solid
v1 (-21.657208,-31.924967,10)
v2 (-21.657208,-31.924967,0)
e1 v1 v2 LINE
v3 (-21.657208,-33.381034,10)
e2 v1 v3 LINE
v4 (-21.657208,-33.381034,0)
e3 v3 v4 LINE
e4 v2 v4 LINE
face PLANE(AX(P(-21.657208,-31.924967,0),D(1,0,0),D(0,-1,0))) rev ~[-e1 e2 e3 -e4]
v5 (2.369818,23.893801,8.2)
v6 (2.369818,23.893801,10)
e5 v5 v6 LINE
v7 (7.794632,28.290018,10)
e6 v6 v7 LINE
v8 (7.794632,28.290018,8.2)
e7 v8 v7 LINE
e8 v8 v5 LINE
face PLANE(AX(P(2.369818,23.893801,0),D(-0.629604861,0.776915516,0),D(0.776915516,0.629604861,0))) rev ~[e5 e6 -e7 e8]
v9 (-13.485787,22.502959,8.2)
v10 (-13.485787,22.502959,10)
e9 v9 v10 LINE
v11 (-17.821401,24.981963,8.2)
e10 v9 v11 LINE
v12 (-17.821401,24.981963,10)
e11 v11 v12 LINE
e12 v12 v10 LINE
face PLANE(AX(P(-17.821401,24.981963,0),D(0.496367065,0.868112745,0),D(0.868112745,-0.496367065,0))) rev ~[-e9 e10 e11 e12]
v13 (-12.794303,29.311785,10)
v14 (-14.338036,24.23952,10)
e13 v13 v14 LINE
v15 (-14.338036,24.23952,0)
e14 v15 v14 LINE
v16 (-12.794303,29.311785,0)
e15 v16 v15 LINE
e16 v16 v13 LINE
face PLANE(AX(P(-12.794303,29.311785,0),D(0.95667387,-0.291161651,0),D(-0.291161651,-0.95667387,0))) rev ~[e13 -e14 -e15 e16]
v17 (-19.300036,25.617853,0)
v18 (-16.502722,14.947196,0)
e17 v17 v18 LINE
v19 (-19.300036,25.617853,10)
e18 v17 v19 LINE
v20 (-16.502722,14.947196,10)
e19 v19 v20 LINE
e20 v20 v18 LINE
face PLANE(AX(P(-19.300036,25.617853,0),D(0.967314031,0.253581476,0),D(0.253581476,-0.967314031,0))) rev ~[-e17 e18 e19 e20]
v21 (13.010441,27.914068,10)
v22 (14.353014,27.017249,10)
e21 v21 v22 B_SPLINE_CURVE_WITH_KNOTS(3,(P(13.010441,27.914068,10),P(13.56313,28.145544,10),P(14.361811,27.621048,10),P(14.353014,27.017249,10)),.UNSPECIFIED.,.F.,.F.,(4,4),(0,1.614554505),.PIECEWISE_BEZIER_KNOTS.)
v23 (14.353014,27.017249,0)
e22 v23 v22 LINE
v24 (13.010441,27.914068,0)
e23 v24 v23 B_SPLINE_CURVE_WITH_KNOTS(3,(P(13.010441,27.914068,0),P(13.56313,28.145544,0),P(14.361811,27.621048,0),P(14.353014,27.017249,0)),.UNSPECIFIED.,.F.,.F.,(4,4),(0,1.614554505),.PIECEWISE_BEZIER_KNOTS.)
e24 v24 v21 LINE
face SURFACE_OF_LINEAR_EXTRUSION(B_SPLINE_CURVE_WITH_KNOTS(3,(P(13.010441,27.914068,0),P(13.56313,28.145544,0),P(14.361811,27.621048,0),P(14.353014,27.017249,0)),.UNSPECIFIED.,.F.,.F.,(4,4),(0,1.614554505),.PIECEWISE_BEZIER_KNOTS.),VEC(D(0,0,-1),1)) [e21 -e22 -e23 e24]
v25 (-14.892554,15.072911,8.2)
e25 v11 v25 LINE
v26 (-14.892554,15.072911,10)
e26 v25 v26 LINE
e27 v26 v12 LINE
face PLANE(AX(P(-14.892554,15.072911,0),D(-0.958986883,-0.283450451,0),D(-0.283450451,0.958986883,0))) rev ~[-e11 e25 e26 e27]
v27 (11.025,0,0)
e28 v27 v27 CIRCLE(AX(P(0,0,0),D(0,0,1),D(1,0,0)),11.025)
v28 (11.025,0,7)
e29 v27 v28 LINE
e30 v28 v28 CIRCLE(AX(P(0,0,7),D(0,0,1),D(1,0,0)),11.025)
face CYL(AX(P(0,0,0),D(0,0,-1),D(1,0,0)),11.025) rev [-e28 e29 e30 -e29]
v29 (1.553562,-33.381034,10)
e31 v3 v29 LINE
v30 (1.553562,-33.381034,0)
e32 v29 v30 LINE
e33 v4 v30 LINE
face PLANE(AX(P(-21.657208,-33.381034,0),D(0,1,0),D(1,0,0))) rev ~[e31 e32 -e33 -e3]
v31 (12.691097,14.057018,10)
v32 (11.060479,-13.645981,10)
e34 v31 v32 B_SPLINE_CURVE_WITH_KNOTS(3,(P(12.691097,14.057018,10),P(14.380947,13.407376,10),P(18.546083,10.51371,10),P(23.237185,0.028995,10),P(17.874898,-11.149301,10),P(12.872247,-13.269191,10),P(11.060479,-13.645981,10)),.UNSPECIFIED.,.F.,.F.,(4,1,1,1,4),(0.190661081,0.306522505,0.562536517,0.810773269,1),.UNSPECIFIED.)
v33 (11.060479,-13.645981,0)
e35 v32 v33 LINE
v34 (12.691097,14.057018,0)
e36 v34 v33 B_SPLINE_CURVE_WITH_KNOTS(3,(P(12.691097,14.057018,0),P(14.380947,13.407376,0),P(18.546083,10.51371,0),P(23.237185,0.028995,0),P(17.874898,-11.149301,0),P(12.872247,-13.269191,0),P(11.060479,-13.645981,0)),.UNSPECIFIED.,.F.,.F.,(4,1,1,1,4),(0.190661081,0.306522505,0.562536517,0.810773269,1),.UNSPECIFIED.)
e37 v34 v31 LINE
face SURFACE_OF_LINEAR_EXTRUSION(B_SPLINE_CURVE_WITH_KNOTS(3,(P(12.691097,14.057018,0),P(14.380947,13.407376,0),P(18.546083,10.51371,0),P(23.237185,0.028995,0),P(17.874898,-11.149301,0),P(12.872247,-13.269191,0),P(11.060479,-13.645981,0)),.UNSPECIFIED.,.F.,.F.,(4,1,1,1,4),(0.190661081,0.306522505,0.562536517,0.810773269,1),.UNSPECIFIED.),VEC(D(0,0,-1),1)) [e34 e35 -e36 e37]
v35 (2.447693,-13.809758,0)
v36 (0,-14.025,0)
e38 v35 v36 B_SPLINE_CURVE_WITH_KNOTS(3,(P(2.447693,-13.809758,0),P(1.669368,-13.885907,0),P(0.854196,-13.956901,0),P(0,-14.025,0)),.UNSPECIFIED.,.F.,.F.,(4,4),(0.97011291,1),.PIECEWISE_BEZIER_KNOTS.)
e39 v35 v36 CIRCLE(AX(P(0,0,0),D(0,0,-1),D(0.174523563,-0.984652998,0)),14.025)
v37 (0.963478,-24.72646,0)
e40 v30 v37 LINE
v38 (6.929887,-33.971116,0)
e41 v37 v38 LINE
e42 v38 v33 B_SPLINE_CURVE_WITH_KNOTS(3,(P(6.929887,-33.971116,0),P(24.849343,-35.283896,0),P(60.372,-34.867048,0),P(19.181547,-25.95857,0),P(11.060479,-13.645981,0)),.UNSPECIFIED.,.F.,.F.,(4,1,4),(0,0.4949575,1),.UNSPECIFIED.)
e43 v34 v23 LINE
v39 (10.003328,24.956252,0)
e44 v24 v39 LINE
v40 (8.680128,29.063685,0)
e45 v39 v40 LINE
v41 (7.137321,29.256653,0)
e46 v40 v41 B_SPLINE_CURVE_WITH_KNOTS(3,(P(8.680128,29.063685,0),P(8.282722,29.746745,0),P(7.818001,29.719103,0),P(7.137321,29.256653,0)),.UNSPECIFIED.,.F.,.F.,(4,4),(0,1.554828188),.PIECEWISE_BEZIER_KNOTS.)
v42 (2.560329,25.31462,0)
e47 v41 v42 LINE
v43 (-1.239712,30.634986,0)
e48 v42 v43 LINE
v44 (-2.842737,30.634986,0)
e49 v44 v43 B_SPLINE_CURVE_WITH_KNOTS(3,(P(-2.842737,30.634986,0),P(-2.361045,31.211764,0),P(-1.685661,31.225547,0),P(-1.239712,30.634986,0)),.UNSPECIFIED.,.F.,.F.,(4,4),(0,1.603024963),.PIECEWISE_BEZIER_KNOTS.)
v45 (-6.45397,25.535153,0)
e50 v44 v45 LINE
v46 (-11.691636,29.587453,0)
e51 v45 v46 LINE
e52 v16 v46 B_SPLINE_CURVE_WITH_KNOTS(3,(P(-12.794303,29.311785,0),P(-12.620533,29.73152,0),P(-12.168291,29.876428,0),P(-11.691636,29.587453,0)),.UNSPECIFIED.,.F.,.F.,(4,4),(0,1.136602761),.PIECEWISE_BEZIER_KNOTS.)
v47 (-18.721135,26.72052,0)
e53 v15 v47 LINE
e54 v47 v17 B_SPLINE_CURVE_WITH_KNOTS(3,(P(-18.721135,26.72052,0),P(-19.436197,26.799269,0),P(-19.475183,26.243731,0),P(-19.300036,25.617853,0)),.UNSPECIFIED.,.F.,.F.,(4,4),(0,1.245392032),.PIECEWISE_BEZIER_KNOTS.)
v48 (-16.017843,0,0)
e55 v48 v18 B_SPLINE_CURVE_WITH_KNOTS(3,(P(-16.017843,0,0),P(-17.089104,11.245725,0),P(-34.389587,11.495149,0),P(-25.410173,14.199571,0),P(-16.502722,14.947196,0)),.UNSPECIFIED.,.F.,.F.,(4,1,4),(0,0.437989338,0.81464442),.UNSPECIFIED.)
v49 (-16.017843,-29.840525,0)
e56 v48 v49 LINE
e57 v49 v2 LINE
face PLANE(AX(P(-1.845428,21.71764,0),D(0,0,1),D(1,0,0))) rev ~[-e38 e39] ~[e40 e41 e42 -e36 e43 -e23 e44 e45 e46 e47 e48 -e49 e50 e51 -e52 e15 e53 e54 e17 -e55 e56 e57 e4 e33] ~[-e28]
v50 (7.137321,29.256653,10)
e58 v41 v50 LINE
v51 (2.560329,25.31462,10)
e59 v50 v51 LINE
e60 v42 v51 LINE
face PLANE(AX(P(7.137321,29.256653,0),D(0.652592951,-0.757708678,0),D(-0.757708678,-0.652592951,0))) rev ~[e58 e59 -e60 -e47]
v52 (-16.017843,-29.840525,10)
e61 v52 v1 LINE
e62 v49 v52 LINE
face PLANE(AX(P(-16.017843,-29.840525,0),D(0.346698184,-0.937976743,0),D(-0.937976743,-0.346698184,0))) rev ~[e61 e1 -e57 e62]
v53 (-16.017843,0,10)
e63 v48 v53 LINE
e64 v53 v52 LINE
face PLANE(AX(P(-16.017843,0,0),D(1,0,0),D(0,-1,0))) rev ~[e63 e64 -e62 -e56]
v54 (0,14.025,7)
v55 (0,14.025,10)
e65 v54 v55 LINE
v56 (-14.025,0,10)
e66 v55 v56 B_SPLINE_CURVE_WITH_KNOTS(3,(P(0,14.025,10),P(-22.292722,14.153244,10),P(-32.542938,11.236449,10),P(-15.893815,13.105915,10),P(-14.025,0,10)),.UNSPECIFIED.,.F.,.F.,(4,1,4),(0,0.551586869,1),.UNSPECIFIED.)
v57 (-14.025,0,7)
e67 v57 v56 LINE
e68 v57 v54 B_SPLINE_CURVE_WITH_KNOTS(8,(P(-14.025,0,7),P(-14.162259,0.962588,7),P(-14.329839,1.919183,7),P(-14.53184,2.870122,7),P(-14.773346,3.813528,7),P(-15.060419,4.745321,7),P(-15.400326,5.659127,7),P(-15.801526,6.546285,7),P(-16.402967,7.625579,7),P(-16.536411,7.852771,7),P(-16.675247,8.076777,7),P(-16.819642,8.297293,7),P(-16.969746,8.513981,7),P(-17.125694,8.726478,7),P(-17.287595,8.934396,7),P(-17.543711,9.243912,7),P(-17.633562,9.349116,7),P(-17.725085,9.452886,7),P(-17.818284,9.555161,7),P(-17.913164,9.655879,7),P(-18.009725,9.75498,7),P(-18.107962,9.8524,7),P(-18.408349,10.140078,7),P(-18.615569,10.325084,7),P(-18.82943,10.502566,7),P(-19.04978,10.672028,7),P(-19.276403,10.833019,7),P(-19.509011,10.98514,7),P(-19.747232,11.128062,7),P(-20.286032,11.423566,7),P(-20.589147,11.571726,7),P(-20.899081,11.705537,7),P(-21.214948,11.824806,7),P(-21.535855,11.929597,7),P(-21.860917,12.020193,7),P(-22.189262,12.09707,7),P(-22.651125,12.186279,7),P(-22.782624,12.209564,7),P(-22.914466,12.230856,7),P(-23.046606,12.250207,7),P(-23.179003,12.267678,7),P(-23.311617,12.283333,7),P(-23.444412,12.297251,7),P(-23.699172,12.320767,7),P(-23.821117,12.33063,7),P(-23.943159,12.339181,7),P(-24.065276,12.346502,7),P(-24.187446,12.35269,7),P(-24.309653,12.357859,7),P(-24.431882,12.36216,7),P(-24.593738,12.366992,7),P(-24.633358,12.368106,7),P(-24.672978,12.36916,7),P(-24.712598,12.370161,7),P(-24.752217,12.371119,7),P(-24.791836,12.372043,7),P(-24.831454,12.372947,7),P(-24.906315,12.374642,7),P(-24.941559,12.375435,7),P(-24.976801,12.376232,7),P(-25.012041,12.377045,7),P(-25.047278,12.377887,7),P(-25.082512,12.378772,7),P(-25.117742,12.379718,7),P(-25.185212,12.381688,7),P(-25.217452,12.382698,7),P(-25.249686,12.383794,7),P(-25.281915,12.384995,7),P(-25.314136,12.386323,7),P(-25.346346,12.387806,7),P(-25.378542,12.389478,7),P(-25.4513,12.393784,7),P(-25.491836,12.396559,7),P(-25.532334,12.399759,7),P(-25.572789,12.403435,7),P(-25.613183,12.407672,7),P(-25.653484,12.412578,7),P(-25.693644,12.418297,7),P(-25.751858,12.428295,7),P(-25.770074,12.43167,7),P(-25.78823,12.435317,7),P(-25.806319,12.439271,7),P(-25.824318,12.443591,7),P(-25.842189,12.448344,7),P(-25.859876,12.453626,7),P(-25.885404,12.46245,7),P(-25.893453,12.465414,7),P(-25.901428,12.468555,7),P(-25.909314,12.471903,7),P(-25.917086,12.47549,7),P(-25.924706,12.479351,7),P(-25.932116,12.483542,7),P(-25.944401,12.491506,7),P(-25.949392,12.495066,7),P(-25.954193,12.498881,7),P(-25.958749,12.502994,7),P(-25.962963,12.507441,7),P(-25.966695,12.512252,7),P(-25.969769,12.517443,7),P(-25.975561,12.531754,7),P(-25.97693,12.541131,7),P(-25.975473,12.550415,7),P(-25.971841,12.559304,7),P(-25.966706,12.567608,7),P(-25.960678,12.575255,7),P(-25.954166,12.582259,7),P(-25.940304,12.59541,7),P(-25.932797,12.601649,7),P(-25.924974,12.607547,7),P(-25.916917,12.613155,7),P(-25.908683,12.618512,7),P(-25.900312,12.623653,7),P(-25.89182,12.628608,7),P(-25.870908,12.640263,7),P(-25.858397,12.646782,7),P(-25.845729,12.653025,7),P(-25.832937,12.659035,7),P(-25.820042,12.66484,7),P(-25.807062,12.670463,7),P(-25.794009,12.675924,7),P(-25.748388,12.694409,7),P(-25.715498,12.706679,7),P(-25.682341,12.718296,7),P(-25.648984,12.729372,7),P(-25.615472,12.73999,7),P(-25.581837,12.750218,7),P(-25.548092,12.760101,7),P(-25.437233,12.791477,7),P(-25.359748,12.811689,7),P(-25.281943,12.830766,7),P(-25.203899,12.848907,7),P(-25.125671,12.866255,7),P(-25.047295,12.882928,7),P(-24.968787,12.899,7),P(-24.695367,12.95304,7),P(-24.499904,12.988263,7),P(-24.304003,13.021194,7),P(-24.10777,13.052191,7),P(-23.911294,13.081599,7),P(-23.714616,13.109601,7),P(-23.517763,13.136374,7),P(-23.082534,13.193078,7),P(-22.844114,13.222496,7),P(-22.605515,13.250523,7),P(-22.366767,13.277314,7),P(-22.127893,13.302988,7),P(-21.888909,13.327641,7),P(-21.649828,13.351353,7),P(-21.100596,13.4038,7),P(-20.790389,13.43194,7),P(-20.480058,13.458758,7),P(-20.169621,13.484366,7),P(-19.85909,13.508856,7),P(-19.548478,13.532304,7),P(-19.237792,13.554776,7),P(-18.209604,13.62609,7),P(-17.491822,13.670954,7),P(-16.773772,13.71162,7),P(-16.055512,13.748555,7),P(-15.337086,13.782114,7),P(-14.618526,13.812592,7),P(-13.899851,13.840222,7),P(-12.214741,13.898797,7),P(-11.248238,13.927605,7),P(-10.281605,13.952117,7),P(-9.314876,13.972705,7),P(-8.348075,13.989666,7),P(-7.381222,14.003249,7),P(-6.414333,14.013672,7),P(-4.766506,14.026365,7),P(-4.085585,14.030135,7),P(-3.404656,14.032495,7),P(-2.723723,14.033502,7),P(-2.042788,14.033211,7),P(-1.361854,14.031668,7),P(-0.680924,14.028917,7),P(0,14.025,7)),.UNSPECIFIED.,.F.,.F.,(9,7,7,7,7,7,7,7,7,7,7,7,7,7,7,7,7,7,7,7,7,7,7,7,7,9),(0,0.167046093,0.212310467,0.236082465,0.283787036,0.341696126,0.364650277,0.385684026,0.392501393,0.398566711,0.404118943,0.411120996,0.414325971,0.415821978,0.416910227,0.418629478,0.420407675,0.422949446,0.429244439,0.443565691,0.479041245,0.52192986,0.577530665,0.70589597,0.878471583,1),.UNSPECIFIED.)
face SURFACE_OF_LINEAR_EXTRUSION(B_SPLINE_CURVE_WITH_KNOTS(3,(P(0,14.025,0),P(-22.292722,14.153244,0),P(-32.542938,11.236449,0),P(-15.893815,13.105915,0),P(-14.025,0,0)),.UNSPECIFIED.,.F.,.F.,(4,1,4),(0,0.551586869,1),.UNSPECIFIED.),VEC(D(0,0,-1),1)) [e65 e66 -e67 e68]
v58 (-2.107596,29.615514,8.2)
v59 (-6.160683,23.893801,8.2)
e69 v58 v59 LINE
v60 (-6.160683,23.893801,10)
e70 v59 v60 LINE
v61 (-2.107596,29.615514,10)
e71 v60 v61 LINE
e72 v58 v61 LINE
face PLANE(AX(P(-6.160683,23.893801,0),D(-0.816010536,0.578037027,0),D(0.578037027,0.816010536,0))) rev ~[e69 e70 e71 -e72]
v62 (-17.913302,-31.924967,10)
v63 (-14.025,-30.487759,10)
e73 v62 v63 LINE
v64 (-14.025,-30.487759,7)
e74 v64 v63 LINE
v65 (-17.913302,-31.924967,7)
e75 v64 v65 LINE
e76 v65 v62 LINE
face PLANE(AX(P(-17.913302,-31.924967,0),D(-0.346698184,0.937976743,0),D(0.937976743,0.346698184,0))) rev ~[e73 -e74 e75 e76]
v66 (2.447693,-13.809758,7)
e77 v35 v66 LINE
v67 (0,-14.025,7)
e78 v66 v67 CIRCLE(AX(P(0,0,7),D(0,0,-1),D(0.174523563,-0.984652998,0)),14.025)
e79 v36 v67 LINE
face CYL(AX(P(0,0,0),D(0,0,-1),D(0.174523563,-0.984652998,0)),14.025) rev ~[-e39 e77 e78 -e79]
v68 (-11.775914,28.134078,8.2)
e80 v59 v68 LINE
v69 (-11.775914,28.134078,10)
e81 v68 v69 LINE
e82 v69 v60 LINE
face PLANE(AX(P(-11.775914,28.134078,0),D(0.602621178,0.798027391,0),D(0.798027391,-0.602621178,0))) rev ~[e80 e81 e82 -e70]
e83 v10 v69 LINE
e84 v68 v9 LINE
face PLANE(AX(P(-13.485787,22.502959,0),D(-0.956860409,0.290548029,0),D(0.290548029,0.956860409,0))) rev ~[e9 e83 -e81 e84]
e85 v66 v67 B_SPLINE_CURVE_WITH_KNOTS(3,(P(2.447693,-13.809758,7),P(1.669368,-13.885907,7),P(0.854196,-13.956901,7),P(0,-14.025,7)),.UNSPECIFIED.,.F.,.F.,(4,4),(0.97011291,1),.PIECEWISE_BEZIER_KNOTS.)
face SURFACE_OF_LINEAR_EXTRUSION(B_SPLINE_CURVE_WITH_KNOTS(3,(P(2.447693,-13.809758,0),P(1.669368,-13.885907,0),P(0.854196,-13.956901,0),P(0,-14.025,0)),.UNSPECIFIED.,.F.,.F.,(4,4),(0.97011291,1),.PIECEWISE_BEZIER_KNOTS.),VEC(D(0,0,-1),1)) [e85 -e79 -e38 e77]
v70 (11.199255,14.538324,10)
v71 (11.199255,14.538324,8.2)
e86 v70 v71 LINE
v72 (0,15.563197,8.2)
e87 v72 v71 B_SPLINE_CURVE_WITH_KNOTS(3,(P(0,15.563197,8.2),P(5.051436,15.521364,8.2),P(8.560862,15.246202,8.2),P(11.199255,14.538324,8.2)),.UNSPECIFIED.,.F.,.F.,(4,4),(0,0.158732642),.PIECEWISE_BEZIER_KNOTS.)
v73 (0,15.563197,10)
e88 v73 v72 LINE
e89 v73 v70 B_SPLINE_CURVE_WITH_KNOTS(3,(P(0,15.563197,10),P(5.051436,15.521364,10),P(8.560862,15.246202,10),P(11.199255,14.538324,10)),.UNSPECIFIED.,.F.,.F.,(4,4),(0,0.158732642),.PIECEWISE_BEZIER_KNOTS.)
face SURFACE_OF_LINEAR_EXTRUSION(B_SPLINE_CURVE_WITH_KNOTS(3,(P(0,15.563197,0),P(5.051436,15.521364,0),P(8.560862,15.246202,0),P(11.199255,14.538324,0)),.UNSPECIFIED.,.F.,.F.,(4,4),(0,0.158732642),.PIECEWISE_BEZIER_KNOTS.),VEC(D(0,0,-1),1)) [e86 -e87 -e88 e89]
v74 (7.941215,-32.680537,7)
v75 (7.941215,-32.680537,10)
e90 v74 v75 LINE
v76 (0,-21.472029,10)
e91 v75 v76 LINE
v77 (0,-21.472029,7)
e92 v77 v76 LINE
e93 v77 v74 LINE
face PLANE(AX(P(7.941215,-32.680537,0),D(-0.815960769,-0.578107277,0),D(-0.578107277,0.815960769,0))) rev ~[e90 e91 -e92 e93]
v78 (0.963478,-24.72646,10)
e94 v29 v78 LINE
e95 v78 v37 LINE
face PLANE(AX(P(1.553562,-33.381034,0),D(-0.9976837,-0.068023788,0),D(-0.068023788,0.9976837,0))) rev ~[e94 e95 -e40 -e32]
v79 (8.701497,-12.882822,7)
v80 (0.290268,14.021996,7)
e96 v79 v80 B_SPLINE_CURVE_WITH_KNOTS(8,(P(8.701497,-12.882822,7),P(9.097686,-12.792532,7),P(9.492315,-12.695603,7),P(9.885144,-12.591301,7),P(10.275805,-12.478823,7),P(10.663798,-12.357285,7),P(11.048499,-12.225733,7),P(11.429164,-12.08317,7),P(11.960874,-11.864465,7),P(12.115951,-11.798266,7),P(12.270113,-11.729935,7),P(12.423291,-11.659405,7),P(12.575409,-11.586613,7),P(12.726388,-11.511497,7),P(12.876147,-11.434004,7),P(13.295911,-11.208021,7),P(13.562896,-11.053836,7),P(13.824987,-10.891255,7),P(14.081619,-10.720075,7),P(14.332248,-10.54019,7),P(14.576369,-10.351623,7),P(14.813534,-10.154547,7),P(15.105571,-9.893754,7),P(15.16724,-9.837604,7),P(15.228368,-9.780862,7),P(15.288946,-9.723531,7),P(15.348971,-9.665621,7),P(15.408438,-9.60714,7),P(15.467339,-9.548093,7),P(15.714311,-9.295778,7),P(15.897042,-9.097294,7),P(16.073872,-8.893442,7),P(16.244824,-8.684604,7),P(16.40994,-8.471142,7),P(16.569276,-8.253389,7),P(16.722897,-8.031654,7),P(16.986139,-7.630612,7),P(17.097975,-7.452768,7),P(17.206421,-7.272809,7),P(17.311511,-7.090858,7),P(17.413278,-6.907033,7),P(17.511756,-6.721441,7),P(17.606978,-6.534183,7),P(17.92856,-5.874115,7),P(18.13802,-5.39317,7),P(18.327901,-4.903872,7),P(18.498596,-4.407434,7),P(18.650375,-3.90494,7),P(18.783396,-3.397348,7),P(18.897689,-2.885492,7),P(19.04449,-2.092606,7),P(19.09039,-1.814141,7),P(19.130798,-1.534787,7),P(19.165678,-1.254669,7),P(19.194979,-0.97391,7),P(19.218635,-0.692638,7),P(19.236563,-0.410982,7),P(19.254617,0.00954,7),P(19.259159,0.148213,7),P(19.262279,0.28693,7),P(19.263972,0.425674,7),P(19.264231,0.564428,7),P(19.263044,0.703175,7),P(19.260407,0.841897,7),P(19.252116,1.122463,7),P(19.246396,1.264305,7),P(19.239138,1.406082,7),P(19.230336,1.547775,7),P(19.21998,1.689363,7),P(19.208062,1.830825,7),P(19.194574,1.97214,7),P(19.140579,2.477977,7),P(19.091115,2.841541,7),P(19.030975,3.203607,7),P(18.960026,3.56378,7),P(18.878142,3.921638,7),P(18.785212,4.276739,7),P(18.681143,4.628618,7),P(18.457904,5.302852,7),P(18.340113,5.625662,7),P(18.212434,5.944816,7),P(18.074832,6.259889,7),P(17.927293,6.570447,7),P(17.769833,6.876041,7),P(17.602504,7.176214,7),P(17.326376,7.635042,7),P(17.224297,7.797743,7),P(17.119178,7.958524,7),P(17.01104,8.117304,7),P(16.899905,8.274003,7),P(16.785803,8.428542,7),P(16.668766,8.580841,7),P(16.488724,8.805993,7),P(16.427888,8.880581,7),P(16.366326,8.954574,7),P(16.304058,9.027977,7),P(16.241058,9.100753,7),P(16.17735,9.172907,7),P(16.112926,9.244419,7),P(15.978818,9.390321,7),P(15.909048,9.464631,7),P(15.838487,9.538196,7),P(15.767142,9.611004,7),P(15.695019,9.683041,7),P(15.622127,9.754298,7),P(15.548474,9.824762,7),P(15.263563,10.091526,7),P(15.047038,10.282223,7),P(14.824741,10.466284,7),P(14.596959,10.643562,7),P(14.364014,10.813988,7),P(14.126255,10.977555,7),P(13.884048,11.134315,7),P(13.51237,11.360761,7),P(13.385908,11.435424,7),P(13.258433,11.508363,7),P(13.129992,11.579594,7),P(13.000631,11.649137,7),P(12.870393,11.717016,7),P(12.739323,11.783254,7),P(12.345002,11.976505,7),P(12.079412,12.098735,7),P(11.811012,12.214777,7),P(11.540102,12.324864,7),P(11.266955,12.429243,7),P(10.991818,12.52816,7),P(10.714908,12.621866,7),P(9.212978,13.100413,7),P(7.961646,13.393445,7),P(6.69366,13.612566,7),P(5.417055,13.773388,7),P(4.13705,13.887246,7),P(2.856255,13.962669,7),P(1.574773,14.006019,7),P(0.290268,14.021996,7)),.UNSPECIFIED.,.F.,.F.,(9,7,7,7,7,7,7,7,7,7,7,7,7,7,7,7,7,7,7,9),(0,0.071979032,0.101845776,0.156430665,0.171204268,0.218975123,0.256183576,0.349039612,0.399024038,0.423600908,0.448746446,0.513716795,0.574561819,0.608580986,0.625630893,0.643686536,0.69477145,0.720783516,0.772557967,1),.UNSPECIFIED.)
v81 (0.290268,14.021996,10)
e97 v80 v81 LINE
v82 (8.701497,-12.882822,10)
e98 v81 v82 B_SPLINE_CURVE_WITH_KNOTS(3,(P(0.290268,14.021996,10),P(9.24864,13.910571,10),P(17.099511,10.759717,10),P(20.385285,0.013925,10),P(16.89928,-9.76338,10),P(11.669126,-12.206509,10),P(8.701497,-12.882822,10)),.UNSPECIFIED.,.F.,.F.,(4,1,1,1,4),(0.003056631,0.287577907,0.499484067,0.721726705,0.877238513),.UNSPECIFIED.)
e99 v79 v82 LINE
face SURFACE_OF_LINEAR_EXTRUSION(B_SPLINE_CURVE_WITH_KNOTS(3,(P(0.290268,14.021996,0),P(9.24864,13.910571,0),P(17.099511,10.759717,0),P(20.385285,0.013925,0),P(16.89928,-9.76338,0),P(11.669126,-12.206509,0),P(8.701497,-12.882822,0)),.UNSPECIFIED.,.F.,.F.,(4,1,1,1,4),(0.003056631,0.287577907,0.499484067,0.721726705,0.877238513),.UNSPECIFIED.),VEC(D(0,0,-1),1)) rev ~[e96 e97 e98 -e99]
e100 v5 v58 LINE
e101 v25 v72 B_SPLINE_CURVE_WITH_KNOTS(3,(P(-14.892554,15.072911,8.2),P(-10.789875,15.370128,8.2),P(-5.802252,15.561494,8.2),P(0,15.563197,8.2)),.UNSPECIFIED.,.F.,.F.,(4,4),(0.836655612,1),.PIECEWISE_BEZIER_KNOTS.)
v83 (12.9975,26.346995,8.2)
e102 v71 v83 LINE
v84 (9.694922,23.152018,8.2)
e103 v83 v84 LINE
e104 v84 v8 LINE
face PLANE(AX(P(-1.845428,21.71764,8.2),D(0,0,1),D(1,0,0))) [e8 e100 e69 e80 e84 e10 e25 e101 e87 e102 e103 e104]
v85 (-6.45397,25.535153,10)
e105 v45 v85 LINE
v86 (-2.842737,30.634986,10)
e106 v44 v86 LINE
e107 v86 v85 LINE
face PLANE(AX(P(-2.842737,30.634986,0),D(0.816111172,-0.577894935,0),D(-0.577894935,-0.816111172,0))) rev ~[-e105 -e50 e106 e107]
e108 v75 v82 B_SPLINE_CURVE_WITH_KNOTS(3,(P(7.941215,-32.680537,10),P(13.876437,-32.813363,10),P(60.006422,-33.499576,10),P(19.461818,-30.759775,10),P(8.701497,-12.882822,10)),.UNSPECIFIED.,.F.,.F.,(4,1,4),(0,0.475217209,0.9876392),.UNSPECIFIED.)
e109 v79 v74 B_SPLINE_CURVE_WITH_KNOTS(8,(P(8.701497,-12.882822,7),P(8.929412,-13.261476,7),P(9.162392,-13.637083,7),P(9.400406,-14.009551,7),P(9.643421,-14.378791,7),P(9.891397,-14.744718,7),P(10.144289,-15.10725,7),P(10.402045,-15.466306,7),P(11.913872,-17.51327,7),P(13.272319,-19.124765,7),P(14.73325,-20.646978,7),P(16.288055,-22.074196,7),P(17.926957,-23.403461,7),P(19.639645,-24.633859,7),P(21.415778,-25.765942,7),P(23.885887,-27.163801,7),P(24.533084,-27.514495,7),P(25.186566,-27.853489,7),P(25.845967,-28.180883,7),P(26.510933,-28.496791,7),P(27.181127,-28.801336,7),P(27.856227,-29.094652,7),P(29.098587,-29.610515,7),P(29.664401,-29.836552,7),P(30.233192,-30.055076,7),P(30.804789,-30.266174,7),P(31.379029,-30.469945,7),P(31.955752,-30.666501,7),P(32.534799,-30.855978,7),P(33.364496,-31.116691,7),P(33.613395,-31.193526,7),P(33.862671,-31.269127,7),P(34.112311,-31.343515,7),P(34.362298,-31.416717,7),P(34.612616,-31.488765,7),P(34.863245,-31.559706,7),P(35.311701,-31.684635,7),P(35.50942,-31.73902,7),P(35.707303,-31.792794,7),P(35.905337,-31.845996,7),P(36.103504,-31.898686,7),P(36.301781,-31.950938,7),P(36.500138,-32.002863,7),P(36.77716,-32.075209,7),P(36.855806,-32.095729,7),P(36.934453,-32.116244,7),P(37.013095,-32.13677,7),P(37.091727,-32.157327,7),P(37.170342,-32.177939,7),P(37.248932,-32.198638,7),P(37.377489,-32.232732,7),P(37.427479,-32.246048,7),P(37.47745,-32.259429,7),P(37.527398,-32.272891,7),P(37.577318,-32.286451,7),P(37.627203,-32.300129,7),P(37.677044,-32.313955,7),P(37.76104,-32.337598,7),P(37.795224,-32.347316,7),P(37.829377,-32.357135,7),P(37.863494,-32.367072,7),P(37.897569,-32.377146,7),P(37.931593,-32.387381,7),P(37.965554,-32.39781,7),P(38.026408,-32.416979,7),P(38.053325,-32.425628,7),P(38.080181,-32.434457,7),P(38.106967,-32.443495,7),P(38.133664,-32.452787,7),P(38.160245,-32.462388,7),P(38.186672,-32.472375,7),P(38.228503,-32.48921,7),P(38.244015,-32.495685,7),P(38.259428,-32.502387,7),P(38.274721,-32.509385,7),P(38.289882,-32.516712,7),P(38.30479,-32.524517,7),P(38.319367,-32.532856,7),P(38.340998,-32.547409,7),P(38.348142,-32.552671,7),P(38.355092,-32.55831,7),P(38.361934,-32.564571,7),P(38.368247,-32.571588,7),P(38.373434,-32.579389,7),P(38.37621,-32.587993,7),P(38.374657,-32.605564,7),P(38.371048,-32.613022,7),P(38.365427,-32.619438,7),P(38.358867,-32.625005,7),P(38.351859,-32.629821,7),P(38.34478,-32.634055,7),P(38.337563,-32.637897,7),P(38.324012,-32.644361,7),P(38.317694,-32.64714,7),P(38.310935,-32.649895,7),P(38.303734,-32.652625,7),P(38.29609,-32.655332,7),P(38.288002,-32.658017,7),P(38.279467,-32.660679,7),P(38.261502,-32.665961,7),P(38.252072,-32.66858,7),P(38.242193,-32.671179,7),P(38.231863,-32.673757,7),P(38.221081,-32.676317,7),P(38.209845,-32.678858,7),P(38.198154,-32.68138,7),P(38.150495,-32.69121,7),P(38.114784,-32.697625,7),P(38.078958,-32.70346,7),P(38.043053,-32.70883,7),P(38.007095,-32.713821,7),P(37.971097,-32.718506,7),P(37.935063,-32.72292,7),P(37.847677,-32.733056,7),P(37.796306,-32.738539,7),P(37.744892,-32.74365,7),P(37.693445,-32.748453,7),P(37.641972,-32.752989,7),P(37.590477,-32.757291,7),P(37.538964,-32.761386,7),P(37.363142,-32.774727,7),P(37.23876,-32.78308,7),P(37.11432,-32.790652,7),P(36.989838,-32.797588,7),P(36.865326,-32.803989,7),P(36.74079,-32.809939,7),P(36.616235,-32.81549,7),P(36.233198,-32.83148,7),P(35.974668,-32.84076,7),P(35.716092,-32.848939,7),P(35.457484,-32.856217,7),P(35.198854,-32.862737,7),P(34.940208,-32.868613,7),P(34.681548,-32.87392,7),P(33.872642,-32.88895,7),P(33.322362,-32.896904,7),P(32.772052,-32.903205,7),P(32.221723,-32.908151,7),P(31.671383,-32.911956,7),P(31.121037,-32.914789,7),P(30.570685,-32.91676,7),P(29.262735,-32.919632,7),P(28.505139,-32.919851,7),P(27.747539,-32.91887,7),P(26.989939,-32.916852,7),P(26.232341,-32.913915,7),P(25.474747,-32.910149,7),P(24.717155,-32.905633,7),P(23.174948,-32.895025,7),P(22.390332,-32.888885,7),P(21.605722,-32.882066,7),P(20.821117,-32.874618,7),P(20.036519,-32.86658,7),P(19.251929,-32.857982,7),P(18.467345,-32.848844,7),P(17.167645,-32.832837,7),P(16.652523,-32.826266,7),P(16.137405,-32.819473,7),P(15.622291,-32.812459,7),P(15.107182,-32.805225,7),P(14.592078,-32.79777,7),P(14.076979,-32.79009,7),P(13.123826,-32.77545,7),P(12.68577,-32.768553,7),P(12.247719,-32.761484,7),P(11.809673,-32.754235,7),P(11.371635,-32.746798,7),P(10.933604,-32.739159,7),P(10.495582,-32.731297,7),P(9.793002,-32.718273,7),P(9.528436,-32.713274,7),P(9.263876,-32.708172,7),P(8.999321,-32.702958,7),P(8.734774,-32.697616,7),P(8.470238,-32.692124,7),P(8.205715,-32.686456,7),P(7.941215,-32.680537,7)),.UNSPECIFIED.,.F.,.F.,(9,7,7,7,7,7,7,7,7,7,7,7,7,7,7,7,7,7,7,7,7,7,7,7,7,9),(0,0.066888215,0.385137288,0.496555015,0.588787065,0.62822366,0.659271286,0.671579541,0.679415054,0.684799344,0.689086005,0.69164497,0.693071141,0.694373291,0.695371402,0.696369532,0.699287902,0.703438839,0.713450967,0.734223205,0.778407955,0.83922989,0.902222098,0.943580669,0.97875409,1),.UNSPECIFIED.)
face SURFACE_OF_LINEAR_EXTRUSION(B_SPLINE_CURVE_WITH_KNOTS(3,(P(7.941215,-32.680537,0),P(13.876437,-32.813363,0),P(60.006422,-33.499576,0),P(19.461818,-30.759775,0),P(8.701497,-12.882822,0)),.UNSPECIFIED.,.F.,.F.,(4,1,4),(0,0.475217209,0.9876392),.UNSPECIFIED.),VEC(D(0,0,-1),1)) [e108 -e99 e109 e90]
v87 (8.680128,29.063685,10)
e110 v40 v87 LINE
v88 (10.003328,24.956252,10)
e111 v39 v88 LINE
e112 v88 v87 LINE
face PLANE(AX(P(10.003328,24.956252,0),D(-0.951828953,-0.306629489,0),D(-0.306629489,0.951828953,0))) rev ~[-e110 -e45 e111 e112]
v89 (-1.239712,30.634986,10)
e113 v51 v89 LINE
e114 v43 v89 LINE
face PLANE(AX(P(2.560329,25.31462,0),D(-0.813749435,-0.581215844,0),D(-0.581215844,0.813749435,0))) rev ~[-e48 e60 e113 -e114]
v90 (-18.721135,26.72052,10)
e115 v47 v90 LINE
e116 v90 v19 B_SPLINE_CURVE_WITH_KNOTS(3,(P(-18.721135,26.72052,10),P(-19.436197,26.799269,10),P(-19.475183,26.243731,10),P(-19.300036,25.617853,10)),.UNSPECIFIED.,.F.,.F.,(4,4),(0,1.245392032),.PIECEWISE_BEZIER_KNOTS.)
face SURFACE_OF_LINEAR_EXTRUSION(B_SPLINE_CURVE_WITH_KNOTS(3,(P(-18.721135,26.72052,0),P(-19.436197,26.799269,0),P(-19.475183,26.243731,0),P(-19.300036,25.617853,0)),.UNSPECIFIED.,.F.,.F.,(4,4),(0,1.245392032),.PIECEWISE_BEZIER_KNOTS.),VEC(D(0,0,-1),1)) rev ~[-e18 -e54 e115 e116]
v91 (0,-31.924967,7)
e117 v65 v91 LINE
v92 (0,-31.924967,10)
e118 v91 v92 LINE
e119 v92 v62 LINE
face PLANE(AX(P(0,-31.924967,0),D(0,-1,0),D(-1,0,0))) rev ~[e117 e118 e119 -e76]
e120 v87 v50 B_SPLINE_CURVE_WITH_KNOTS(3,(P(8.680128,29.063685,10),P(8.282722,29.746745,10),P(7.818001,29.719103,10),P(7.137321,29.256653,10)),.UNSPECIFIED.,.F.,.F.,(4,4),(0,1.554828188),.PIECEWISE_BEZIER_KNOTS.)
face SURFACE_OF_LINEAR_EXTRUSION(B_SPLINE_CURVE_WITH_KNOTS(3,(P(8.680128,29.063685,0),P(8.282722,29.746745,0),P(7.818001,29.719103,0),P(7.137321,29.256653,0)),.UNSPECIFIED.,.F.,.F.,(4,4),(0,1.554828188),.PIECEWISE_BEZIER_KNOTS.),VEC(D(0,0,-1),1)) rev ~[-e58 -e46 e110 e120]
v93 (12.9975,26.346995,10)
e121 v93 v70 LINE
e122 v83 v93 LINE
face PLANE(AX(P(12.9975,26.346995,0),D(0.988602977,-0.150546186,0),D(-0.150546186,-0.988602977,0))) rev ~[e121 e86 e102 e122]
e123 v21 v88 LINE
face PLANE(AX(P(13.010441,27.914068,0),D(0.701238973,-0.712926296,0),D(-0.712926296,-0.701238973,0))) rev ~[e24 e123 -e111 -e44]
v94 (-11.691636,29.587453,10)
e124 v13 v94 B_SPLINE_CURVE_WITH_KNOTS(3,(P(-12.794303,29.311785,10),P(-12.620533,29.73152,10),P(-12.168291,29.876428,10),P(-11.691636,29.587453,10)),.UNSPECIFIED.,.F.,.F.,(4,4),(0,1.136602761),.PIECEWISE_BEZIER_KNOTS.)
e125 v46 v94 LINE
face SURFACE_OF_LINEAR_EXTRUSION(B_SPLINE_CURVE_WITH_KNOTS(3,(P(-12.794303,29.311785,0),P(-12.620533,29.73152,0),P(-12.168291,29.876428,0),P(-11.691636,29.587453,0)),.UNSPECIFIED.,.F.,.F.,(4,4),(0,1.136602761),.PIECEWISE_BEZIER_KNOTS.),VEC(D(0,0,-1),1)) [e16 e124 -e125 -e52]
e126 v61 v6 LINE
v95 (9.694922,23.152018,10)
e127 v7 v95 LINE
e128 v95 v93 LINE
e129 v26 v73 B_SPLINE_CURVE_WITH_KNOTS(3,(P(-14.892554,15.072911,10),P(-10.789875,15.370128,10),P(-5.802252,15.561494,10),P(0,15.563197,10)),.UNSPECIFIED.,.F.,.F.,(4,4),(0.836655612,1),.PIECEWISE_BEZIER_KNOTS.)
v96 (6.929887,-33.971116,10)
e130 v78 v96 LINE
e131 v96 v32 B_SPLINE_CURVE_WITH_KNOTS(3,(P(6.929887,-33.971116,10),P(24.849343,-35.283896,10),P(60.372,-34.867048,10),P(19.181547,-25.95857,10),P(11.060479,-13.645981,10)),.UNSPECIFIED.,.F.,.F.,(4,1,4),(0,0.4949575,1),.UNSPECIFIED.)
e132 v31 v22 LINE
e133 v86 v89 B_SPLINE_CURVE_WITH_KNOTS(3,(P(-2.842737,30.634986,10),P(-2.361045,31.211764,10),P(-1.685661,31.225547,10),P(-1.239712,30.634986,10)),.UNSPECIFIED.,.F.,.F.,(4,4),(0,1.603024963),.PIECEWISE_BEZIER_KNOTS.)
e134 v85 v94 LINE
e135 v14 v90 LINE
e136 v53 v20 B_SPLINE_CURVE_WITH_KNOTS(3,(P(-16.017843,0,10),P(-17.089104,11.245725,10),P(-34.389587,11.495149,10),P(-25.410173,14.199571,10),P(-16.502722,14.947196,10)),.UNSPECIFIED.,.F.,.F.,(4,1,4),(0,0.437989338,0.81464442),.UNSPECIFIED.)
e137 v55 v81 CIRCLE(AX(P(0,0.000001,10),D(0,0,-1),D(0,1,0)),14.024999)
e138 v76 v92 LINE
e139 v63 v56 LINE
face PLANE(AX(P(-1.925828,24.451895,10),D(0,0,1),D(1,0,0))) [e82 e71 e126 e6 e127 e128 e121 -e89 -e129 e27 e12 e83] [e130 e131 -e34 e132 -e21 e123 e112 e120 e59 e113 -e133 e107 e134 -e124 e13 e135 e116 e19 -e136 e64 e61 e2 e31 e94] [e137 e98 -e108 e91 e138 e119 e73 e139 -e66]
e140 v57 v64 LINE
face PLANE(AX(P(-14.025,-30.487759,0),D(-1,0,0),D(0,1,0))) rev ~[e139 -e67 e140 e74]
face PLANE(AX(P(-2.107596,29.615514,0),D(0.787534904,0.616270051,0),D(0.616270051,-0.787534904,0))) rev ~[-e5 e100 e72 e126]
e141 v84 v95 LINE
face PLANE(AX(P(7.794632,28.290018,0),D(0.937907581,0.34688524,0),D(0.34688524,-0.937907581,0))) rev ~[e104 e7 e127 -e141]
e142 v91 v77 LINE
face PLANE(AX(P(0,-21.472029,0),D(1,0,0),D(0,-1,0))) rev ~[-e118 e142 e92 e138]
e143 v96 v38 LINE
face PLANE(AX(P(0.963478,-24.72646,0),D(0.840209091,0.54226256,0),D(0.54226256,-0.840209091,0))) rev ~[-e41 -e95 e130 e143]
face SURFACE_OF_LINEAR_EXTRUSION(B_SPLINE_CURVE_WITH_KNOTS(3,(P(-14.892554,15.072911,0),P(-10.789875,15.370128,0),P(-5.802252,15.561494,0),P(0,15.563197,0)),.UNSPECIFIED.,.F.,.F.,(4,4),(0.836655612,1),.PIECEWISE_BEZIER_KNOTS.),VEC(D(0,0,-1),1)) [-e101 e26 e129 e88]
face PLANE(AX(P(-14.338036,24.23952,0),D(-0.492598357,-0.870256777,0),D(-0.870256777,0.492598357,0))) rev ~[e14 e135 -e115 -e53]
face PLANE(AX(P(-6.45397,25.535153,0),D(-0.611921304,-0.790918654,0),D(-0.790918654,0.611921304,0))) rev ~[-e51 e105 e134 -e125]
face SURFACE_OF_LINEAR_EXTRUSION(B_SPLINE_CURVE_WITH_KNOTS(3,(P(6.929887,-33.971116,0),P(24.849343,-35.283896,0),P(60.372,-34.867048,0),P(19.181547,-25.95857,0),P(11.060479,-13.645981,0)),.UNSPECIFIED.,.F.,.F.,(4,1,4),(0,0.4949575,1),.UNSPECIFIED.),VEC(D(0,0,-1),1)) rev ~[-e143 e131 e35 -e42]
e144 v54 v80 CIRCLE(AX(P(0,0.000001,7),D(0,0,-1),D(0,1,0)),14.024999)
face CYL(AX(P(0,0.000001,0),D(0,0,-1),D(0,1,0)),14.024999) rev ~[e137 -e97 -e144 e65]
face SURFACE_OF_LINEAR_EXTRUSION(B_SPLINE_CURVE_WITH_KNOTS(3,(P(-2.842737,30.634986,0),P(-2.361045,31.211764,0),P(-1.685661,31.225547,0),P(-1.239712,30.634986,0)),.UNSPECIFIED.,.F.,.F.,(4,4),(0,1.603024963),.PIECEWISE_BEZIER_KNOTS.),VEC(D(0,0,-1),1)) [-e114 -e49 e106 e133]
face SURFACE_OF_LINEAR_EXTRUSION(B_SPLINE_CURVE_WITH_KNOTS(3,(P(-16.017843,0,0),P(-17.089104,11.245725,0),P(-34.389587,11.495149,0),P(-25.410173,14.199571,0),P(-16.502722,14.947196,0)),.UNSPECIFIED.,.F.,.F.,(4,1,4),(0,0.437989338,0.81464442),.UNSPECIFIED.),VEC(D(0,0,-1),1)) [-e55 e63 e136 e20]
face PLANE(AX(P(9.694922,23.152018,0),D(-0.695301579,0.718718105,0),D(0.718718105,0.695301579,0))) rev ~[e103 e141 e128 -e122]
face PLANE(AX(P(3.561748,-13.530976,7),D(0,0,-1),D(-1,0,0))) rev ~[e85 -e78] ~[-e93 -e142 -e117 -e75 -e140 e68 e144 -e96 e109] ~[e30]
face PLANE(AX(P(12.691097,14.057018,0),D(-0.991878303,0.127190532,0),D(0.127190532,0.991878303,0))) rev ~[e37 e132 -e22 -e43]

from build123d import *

# Parameters (mm, degrees)
F1_DEPTH = 10
F0_R     = 11.025
F2_DEPTH = 7
F3_DEPTH = 8.2


with BuildPart() as f1:
    # F0 (on Top) → F1 (new body)
    with BuildSketch(Plane.XY):
        with BuildLine():
            Line((-19.3000361323, 25.617852807), (-16.5027223659, 14.9471961935))
            add(Edge.make_bspline(
                [(-16.5027223659, 14.9471961935), (-15.9821834932, 14.9908863575), (-15.4454033317, 15.0328594986), (-14.8925539408, 15.0729105388)],
                knots=[0.8146444204, 0.8146444204, 0.8146444204, 0.8146444204, 0.8366556125, 0.8366556125, 0.8366556125, 0.8366556125], degree=3))
            Line((-14.8925539408, 15.0729105388), (-17.8214006024, 24.9819634817))
            Line((-17.8214006024, 24.9819634817), (-13.4857874364, 22.5029587746))
            Line((-13.4857874364, 22.5029587746), (-11.7759136483, 28.1340777874))
            Line((-11.7759136483, 28.1340777874), (-6.1606834643, 23.8938014954))
            Line((-6.1606834643, 23.8938014954), (-2.1075964905, 29.6155139804))
            Line((-2.1075964905, 29.6155139804), (2.369817812, 23.8938014954))
            Line((2.369817812, 23.8938014954), (7.7946316451, 28.2900184393))
            Line((7.7946316451, 28.2900184393), (9.6949217841, 23.1520179659))
            Line((9.6949217841, 23.1520179659), (12.9975004857, 26.3469954851))
            Line((12.9975004857, 26.3469954851), (11.199255367, 14.5383238121))
            add(Edge.make_bspline(
                [(11.199255367, 14.5383238121), (11.7299576144, 14.3959369713), (12.2254180774, 14.2360425799), (12.6910973587, 14.05701797)],
                knots=[0.1587326419, 0.1587326419, 0.1587326419, 0.1587326419, 0.1906610807, 0.1906610807, 0.1906610807, 0.1906610807], degree=3))
            Line((12.6910973587, 14.05701797), (14.3530135974, 27.0172487944))
            add(Edge.make_bspline(
                [(13.0104408682, 27.9140680165), (13.5631300509, 28.1455442309), (14.3618108705, 27.6210475713), (14.3530135974, 27.0172487944)],
                knots=[0, 0, 0, 0, 1.6145545052, 1.6145545052, 1.6145545052, 1.6145545052], degree=3))
            Line((13.0104408682, 27.9140680165), (10.0033283234, 24.9562524259))
            Line((10.0033283234, 24.9562524259), (8.6801284924, 29.0636848658))
            add(Edge.make_bspline(
                [(8.6801284924, 29.0636848658), (8.282721974, 29.7467447817), (7.8180013224, 29.7191031277), (7.1373213177, 29.2566530406)],
                knots=[0, 0, 0, 0, 1.5548281882, 1.5548281882, 1.5548281882, 1.5548281882], degree=3))
            Line((7.1373213177, 29.2566530406), (2.5603291579, 25.3146197647))
            Line((2.5603291579, 25.3146197647), (-1.2397119331, 30.6349862367))
            add(Edge.make_bspline(
                [(-2.8427368961, 30.6349862367), (-2.3610445205, 31.2117636204), (-1.6856613802, 31.2255471945), (-1.2397119331, 30.6349862367)],
                knots=[0, 0, 0, 0, 1.603024963, 1.603024963, 1.603024963, 1.603024963], degree=3))
            Line((-2.8427368961, 30.6349862367), (-6.4539699815, 25.5351532251))
            Line((-6.4539699815, 25.5351532251), (-11.6916364059, 29.5874532312))
            add(Edge.make_bspline(
                [(-12.7943027765, 29.3117854744), (-12.6205328852, 29.7315195203), (-12.1682910249, 29.876427725), (-11.6916364059, 29.5874532312)],
                knots=[0, 0, 0, 0, 1.1366027613, 1.1366027613, 1.1366027613, 1.1366027613], degree=3))
            Line((-12.7943027765, 29.3117854744), (-14.3380360678, 24.239519611))
            Line((-14.3380360678, 24.239519611), (-18.7211353332, 26.7205201089))
            add(Edge.make_bspline(
                [(-18.7211353332, 26.7205201089), (-19.4361973554, 26.7992690206), (-19.4751825184, 26.2437313795), (-19.3000361323, 25.617852807)],
                knots=[0, 0, 0, 0, 1.2453920322, 1.2453920322, 1.2453920322, 1.2453920322], degree=3))
        make_face()
        with BuildLine():
            add(Edge.make_bspline(
                [(-16.0178430378, 0), (-17.0891042799, 11.2457247451), (-34.3895874626, 11.4951487861), (-25.4101731911, 14.199570976), (-16.5027223659, 14.9471961935)],
                knots=[0, 0, 0, 0, 0.4379893378, 0.8146444204, 0.8146444204, 0.8146444204, 0.8146444204], degree=3))
            Line((-16.0178430378, 0), (-16.0178430378, -29.8405252397))
            Line((-16.0178430378, -29.8405252397), (-21.6572081245, -31.9249667227))
            Line((-21.6572081245, -31.9249667227), (-21.6572081245, -33.3810336888))
            Line((-21.6572081245, -33.3810336888), (1.5535618877, -33.3810336888))
            Line((1.5535618877, -33.3810336888), (0.9634781745, -24.7264597565))
            Line((0.9634781745, -24.7264597565), (6.929886993, -33.9711159468))
            add(Edge.make_bspline(
                [(6.929886993, -33.9711159468), (24.8493433086, -35.2838962809), (60.3720002804, -34.8670480548), (19.1815471681, -25.9585702534), (11.0604790971, -13.6459805071)],
                knots=[0, 0, 0, 0, 0.4949574997, 1, 1, 1, 1], degree=3))
            add(Edge.make_bspline(
                [(12.6910973587, 14.05701797), (14.3809471326, 13.4073762346), (18.5460833461, 10.5137101685), (23.2371850237, 0.0289954641), (17.8748979072, -11.1493005541), (12.8722470254, -13.2691906765), (11.0604790971, -13.6459805071)],
                knots=[0.1906610807, 0.1906610807, 0.1906610807, 0.1906610807, 0.3065225054, 0.5625365171, 0.8107732693, 1, 1, 1, 1], degree=3))
            add(Edge.make_bspline(
                [(11.199255367, 14.5383238121), (11.7299576144, 14.3959369713), (12.2254180774, 14.2360425799), (12.6910973587, 14.05701797)],
                knots=[0.1587326419, 0.1587326419, 0.1587326419, 0.1587326419, 0.1906610807, 0.1906610807, 0.1906610807, 0.1906610807], degree=3))
            add(Edge.make_bspline(
                [(0, 15.5631974339), (5.0514355202, 15.5213642545), (8.5608623501, 15.246201814), (11.199255367, 14.5383238121)],
                knots=[0, 0, 0, 0, 0.1587326419, 0.1587326419, 0.1587326419, 0.1587326419], degree=3))
            add(Edge.make_bspline(
                [(-14.8925539408, 15.0729105388), (-10.7898754349, 15.3701280895), (-5.8022517829, 15.5614940305), (0, 15.5631974339)],
                knots=[0.8366556125, 0.8366556125, 0.8366556125, 0.8366556125, 1, 1, 1, 1], degree=3))
            add(Edge.make_bspline(
                [(-16.5027223659, 14.9471961935), (-15.9821834932, 14.9908863575), (-15.4454033317, 15.0328594986), (-14.8925539408, 15.0729105388)],
                knots=[0.8146444204, 0.8146444204, 0.8146444204, 0.8146444204, 0.8366556125, 0.8366556125, 0.8366556125, 0.8366556125], degree=3))
        make_face()
        with BuildLine():
            add(Edge.make_bspline(
                [(0, 14.025), (-22.2927219479, 14.1532437558), (-32.5429377718, 11.2364486318), (-15.8938150439, 13.1059148162), (-14.025, 0)],
                knots=[0, 0, 0, 0, 0.5515868686, 1, 1, 1, 1], degree=3))
            ThreePointArc((0, 14.025), (0.1451418598, 14.0242489582), (0.2902681747, 14.0219959131))
            add(Edge.make_bspline(
                [(0.2902681747, 14.0219959131), (9.2486399688, 13.9105710304), (17.0995105355, 10.759716712), (20.385285187, 0.0139246379), (16.8992797962, -9.7633800937), (11.6691263972, -12.2065090216), (8.7014966008, -12.8828223231)],
                knots=[0.0030566307, 0.0030566307, 0.0030566307, 0.0030566307, 0.2875779073, 0.4994840668, 0.7217267051, 0.8772385131, 0.8772385131, 0.8772385131, 0.8772385131], degree=3))
            add(Edge.make_bspline(
                [(7.9412147987, -32.6805368676), (13.8764368589, -32.813362548), (60.0064221878, -33.4995761154), (19.4618183039, -30.7597754392), (8.7014966151, -12.8828223083)],
                knots=[0, 0, 0, 0, 0.4752172088, 0.9876392002, 0.9876392002, 0.9876392002, 0.9876392002], degree=3))
            Line((7.9412147987, -32.6805368676), (0, -21.472029388))
            Line((0, -21.472029388), (0, -31.9249667227))
            Line((0, -31.9249667227), (-17.9133024067, -31.9249667227))
            Line((-17.9133024067, -31.9249667227), (-14.025, -30.4877590388))
            Line((-14.025, -30.4877590388), (-14.025, 0))
        make_face(mode=Mode.SUBTRACT)
    extrude(amount=F1_DEPTH)

    # F0 (on Top) → F2 (join)
    with BuildSketch(Plane.XY):
        with BuildLine():
            add(Edge.make_bspline(
                [(-16.0178430378, 0), (-17.0891042799, 11.2457247451), (-34.3895874626, 11.4951487861), (-25.4101731911, 14.199570976), (-16.5027223659, 14.9471961935)],
                knots=[0, 0, 0, 0, 0.4379893378, 0.8146444204, 0.8146444204, 0.8146444204, 0.8146444204], degree=3))
            Line((-16.0178430378, 0), (-16.0178430378, -29.8405252397))
            Line((-16.0178430378, -29.8405252397), (-21.6572081245, -31.9249667227))
            Line((-21.6572081245, -31.9249667227), (-21.6572081245, -33.3810336888))
            Line((-21.6572081245, -33.3810336888), (1.5535618877, -33.3810336888))
            Line((1.5535618877, -33.3810336888), (0.9634781745, -24.7264597565))
            Line((0.9634781745, -24.7264597565), (6.929886993, -33.9711159468))
            add(Edge.make_bspline(
                [(6.929886993, -33.9711159468), (24.8493433086, -35.2838962809), (60.3720002804, -34.8670480548), (19.1815471681, -25.9585702534), (11.0604790971, -13.6459805071)],
                knots=[0, 0, 0, 0, 0.4949574997, 1, 1, 1, 1], degree=3))
            add(Edge.make_bspline(
                [(12.6910973587, 14.05701797), (14.3809471326, 13.4073762346), (18.5460833461, 10.5137101685), (23.2371850237, 0.0289954641), (17.8748979072, -11.1493005541), (12.8722470254, -13.2691906765), (11.0604790971, -13.6459805071)],
                knots=[0.1906610807, 0.1906610807, 0.1906610807, 0.1906610807, 0.3065225054, 0.5625365171, 0.8107732693, 1, 1, 1, 1], degree=3))
            add(Edge.make_bspline(
                [(11.199255367, 14.5383238121), (11.7299576144, 14.3959369713), (12.2254180774, 14.2360425799), (12.6910973587, 14.05701797)],
                knots=[0.1587326419, 0.1587326419, 0.1587326419, 0.1587326419, 0.1906610807, 0.1906610807, 0.1906610807, 0.1906610807], degree=3))
            add(Edge.make_bspline(
                [(0, 15.5631974339), (5.0514355202, 15.5213642545), (8.5608623501, 15.246201814), (11.199255367, 14.5383238121)],
                knots=[0, 0, 0, 0, 0.1587326419, 0.1587326419, 0.1587326419, 0.1587326419], degree=3))
            add(Edge.make_bspline(
                [(-14.8925539408, 15.0729105388), (-10.7898754349, 15.3701280895), (-5.8022517829, 15.5614940305), (0, 15.5631974339)],
                knots=[0.8366556125, 0.8366556125, 0.8366556125, 0.8366556125, 1, 1, 1, 1], degree=3))
            add(Edge.make_bspline(
                [(-16.5027223659, 14.9471961935), (-15.9821834932, 14.9908863575), (-15.4454033317, 15.0328594986), (-14.8925539408, 15.0729105388)],
                knots=[0.8146444204, 0.8146444204, 0.8146444204, 0.8146444204, 0.8366556125, 0.8366556125, 0.8366556125, 0.8366556125], degree=3))
        make_face()
        with BuildLine():
            add(Edge.make_bspline(
                [(0, 14.025), (-22.2927219479, 14.1532437558), (-32.5429377718, 11.2364486318), (-15.8938150439, 13.1059148162), (-14.025, 0)],
                knots=[0, 0, 0, 0, 0.5515868686, 1, 1, 1, 1], degree=3))
            ThreePointArc((0, 14.025), (0.1451418598, 14.0242489582), (0.2902681747, 14.0219959131))
            add(Edge.make_bspline(
                [(0.2902681747, 14.0219959131), (9.2486399688, 13.9105710304), (17.0995105355, 10.759716712), (20.385285187, 0.0139246379), (16.8992797962, -9.7633800937), (11.6691263972, -12.2065090216), (8.7014966008, -12.8828223231)],
                knots=[0.0030566307, 0.0030566307, 0.0030566307, 0.0030566307, 0.2875779073, 0.4994840668, 0.7217267051, 0.8772385131, 0.8772385131, 0.8772385131, 0.8772385131], degree=3))
            add(Edge.make_bspline(
                [(7.9412147987, -32.6805368676), (13.8764368589, -32.813362548), (60.0064221878, -33.4995761154), (19.4618183039, -30.7597754392), (8.7014966151, -12.8828223083)],
                knots=[0, 0, 0, 0, 0.4752172088, 0.9876392002, 0.9876392002, 0.9876392002, 0.9876392002], degree=3))
            Line((7.9412147987, -32.6805368676), (0, -21.472029388))
            Line((0, -21.472029388), (0, -31.9249667227))
            Line((0, -31.9249667227), (-17.9133024067, -31.9249667227))
            Line((-17.9133024067, -31.9249667227), (-14.025, -30.4877590388))
            Line((-14.025, -30.4877590388), (-14.025, 0))
        make_face(mode=Mode.SUBTRACT)
        with BuildLine():
            ThreePointArc((0, -14.025), (-9.9171726061, -9.9171726061), (-14.025, 0))
            Line((-14.025, 0), (-14.025, -30.4877590388))
            Line((-14.025, -30.4877590388), (-17.9133024067, -31.9249667227))
            Line((-17.9133024067, -31.9249667227), (0, -31.9249667227))
            Line((0, -31.9249667227), (0, -21.472029388))
            Line((0, -21.472029388), (7.9412147987, -32.6805368676))
            add(Edge.make_bspline(
                [(7.9412147987, -32.6805368676), (13.8764368589, -32.813362548), (60.0064221878, -33.4995761154), (19.4618183039, -30.7597754392), (8.7014966151, -12.8828223083)],
                knots=[0, 0, 0, 0, 0.4752172088, 0.9876392002, 0.9876392002, 0.9876392002, 0.9876392002], degree=3))
            add(Edge.make_bspline(
                [(8.7014966008, -12.8828223231), (6.9291756993, -13.2867285657), (4.8663444244, -13.5731266075), (2.4476929742, -13.8097582927)],
                knots=[0.8772385131, 0.8772385131, 0.8772385131, 0.8772385131, 0.9701129101, 0.9701129101, 0.9701129101, 0.9701129101], degree=3))
            ThreePointArc((2.4476929742, -13.8097582927), (1.2285692785, -13.9710859466), (0, -14.025))
        make_face()
        with BuildLine():
            add(Edge.make_bspline(
                [(0, 14.025), (0.0972728272, 14.0241944405), (0.1940278004, 14.0231929579), (0.2902681747, 14.0219959131)],
                knots=[0, 0, 0, 0, 0.0030566307, 0.0030566307, 0.0030566307, 0.0030566307], degree=3))
            ThreePointArc((0, 14.025), (-9.9171726061, 9.9171726061), (-14.025, 0))
            ThreePointArc((-14.025, 0), (-9.9171726061, -9.9171726061), (0, -14.025))
            add(Edge.make_bspline(
                [(2.4476929742, -13.8097582927), (1.6693680994, -13.8859066467), (0.8541959122, -13.9569013961), (0, -14.025)],
                knots=[0.9701129101, 0.9701129101, 0.9701129101, 0.9701129101, 1, 1, 1, 1], degree=3))
            ThreePointArc((2.4476929742, -13.8097582927), (5.3148380237, -12.9789491786), (7.9412147987, -11.5601787409))
            ThreePointArc((7.9412147987, -11.5601787409), (12.4112078895, -6.5316570428), (14.025, 0))
            ThreePointArc((14.025, 0), (10.0192723326, 9.8140107461), (0.2902681747, 14.0219959131))
        make_face()
        Circle(F0_R, mode=Mode.SUBTRACT)
        with BuildLine():
            add(Edge.make_bspline(
                [(0.2902681747, 14.0219959131), (9.2486399688, 13.9105710304), (17.0995105355, 10.759716712), (20.385285187, 0.0139246379), (16.8992797962, -9.7633800937), (11.6691263972, -12.2065090216), (8.7014966008, -12.8828223231)],
                knots=[0.0030566307, 0.0030566307, 0.0030566307, 0.0030566307, 0.2875779073, 0.4994840668, 0.7217267051, 0.8772385131, 0.8772385131, 0.8772385131, 0.8772385131], degree=3))
            ThreePointArc((0.2902681747, 14.0219959131), (10.0192723326, 9.8140107461), (14.025, 0))
            ThreePointArc((14.025, 0), (12.4112078895, -6.5316570428), (7.9412147987, -11.5601787409))
            add(Edge.make_bspline(
                [(8.7014966151, -12.8828223083), (8.4419328487, -12.4515889846), (8.1883483332, -12.0107804723), (7.9412147987, -11.5601787409)],
                knots=[0.9876392002, 0.9876392002, 0.9876392002, 0.9876392002, 1, 1, 1, 1], degree=3))
        make_face()
        with BuildLine():
            ThreePointArc((-14.025, 0), (-9.9171726061, 9.9171726061), (0, 14.025))
            add(Edge.make_bspline(
                [(0, 14.025), (-22.2927219479, 14.1532437558), (-32.5429377718, 11.2364486318), (-15.8938150439, 13.1059148162), (-14.025, 0)],
                knots=[0, 0, 0, 0, 0.5515868686, 1, 1, 1, 1], degree=3))
        make_face()
        with BuildLine():
            add(Edge.make_bspline(
                [(8.7014966008, -12.8828223231), (6.9291756993, -13.2867285657), (4.8663444244, -13.5731266075), (2.4476929742, -13.8097582927)],
                knots=[0.8772385131, 0.8772385131, 0.8772385131, 0.8772385131, 0.9701129101, 0.9701129101, 0.9701129101, 0.9701129101], degree=3))
            add(Edge.make_bspline(
                [(8.7014966151, -12.8828223083), (8.4419328487, -12.4515889846), (8.1883483332, -12.0107804723), (7.9412147987, -11.5601787409)],
                knots=[0.9876392002, 0.9876392002, 0.9876392002, 0.9876392002, 1, 1, 1, 1], degree=3))
            ThreePointArc((7.9412147987, -11.5601787409), (5.3148380237, -12.9789491786), (2.4476929742, -13.8097582927))
        make_face()
        with BuildLine():
            ThreePointArc((0.2902681747, 14.0219959131), (0.1451418598, 14.0242489582), (0, 14.025))
            add(Edge.make_bspline(
                [(0, 14.025), (0.0972728272, 14.0241944405), (0.1940278004, 14.0231929579), (0.2902681747, 14.0219959131)],
                knots=[0, 0, 0, 0, 0.0030566307, 0.0030566307, 0.0030566307, 0.0030566307], degree=3))
        make_face()
    extrude(amount=F2_DEPTH)

    # F0 (on Top) → F3 (join)
    with BuildSketch(Plane.XY):
        with BuildLine():
            Line((-17.8214006024, 24.9819634817), (-14.8925539408, 15.0729105388))
            add(Edge.make_bspline(
                [(-14.8925539408, 15.0729105388), (-10.7898754349, 15.3701280895), (-5.8022517829, 15.5614940305), (0, 15.5631974339)],
                knots=[0.8366556125, 0.8366556125, 0.8366556125, 0.8366556125, 1, 1, 1, 1], degree=3))
            add(Edge.make_bspline(
                [(0, 15.5631974339), (5.0514355202, 15.5213642545), (8.5608623501, 15.246201814), (11.199255367, 14.5383238121)],
                knots=[0, 0, 0, 0, 0.1587326419, 0.1587326419, 0.1587326419, 0.1587326419], degree=3))
            Line((11.199255367, 14.5383238121), (12.9975004857, 26.3469954851))
            Line((12.9975004857, 26.3469954851), (9.6949217841, 23.1520179659))
            Line((9.6949217841, 23.1520179659), (7.7946316451, 28.2900184393))
            Line((7.7946316451, 28.2900184393), (2.369817812, 23.8938014954))
            Line((2.369817812, 23.8938014954), (-2.1075964905, 29.6155139804))
            Line((-2.1075964905, 29.6155139804), (-6.1606834643, 23.8938014954))
            Line((-6.1606834643, 23.8938014954), (-11.7759136483, 28.1340777874))
            Line((-11.7759136483, 28.1340777874), (-13.4857874364, 22.5029587746))
            Line((-13.4857874364, 22.5029587746), (-17.8214006024, 24.9819634817))
        make_face()
    extrude(amount=F3_DEPTH)


solid = f1.part
